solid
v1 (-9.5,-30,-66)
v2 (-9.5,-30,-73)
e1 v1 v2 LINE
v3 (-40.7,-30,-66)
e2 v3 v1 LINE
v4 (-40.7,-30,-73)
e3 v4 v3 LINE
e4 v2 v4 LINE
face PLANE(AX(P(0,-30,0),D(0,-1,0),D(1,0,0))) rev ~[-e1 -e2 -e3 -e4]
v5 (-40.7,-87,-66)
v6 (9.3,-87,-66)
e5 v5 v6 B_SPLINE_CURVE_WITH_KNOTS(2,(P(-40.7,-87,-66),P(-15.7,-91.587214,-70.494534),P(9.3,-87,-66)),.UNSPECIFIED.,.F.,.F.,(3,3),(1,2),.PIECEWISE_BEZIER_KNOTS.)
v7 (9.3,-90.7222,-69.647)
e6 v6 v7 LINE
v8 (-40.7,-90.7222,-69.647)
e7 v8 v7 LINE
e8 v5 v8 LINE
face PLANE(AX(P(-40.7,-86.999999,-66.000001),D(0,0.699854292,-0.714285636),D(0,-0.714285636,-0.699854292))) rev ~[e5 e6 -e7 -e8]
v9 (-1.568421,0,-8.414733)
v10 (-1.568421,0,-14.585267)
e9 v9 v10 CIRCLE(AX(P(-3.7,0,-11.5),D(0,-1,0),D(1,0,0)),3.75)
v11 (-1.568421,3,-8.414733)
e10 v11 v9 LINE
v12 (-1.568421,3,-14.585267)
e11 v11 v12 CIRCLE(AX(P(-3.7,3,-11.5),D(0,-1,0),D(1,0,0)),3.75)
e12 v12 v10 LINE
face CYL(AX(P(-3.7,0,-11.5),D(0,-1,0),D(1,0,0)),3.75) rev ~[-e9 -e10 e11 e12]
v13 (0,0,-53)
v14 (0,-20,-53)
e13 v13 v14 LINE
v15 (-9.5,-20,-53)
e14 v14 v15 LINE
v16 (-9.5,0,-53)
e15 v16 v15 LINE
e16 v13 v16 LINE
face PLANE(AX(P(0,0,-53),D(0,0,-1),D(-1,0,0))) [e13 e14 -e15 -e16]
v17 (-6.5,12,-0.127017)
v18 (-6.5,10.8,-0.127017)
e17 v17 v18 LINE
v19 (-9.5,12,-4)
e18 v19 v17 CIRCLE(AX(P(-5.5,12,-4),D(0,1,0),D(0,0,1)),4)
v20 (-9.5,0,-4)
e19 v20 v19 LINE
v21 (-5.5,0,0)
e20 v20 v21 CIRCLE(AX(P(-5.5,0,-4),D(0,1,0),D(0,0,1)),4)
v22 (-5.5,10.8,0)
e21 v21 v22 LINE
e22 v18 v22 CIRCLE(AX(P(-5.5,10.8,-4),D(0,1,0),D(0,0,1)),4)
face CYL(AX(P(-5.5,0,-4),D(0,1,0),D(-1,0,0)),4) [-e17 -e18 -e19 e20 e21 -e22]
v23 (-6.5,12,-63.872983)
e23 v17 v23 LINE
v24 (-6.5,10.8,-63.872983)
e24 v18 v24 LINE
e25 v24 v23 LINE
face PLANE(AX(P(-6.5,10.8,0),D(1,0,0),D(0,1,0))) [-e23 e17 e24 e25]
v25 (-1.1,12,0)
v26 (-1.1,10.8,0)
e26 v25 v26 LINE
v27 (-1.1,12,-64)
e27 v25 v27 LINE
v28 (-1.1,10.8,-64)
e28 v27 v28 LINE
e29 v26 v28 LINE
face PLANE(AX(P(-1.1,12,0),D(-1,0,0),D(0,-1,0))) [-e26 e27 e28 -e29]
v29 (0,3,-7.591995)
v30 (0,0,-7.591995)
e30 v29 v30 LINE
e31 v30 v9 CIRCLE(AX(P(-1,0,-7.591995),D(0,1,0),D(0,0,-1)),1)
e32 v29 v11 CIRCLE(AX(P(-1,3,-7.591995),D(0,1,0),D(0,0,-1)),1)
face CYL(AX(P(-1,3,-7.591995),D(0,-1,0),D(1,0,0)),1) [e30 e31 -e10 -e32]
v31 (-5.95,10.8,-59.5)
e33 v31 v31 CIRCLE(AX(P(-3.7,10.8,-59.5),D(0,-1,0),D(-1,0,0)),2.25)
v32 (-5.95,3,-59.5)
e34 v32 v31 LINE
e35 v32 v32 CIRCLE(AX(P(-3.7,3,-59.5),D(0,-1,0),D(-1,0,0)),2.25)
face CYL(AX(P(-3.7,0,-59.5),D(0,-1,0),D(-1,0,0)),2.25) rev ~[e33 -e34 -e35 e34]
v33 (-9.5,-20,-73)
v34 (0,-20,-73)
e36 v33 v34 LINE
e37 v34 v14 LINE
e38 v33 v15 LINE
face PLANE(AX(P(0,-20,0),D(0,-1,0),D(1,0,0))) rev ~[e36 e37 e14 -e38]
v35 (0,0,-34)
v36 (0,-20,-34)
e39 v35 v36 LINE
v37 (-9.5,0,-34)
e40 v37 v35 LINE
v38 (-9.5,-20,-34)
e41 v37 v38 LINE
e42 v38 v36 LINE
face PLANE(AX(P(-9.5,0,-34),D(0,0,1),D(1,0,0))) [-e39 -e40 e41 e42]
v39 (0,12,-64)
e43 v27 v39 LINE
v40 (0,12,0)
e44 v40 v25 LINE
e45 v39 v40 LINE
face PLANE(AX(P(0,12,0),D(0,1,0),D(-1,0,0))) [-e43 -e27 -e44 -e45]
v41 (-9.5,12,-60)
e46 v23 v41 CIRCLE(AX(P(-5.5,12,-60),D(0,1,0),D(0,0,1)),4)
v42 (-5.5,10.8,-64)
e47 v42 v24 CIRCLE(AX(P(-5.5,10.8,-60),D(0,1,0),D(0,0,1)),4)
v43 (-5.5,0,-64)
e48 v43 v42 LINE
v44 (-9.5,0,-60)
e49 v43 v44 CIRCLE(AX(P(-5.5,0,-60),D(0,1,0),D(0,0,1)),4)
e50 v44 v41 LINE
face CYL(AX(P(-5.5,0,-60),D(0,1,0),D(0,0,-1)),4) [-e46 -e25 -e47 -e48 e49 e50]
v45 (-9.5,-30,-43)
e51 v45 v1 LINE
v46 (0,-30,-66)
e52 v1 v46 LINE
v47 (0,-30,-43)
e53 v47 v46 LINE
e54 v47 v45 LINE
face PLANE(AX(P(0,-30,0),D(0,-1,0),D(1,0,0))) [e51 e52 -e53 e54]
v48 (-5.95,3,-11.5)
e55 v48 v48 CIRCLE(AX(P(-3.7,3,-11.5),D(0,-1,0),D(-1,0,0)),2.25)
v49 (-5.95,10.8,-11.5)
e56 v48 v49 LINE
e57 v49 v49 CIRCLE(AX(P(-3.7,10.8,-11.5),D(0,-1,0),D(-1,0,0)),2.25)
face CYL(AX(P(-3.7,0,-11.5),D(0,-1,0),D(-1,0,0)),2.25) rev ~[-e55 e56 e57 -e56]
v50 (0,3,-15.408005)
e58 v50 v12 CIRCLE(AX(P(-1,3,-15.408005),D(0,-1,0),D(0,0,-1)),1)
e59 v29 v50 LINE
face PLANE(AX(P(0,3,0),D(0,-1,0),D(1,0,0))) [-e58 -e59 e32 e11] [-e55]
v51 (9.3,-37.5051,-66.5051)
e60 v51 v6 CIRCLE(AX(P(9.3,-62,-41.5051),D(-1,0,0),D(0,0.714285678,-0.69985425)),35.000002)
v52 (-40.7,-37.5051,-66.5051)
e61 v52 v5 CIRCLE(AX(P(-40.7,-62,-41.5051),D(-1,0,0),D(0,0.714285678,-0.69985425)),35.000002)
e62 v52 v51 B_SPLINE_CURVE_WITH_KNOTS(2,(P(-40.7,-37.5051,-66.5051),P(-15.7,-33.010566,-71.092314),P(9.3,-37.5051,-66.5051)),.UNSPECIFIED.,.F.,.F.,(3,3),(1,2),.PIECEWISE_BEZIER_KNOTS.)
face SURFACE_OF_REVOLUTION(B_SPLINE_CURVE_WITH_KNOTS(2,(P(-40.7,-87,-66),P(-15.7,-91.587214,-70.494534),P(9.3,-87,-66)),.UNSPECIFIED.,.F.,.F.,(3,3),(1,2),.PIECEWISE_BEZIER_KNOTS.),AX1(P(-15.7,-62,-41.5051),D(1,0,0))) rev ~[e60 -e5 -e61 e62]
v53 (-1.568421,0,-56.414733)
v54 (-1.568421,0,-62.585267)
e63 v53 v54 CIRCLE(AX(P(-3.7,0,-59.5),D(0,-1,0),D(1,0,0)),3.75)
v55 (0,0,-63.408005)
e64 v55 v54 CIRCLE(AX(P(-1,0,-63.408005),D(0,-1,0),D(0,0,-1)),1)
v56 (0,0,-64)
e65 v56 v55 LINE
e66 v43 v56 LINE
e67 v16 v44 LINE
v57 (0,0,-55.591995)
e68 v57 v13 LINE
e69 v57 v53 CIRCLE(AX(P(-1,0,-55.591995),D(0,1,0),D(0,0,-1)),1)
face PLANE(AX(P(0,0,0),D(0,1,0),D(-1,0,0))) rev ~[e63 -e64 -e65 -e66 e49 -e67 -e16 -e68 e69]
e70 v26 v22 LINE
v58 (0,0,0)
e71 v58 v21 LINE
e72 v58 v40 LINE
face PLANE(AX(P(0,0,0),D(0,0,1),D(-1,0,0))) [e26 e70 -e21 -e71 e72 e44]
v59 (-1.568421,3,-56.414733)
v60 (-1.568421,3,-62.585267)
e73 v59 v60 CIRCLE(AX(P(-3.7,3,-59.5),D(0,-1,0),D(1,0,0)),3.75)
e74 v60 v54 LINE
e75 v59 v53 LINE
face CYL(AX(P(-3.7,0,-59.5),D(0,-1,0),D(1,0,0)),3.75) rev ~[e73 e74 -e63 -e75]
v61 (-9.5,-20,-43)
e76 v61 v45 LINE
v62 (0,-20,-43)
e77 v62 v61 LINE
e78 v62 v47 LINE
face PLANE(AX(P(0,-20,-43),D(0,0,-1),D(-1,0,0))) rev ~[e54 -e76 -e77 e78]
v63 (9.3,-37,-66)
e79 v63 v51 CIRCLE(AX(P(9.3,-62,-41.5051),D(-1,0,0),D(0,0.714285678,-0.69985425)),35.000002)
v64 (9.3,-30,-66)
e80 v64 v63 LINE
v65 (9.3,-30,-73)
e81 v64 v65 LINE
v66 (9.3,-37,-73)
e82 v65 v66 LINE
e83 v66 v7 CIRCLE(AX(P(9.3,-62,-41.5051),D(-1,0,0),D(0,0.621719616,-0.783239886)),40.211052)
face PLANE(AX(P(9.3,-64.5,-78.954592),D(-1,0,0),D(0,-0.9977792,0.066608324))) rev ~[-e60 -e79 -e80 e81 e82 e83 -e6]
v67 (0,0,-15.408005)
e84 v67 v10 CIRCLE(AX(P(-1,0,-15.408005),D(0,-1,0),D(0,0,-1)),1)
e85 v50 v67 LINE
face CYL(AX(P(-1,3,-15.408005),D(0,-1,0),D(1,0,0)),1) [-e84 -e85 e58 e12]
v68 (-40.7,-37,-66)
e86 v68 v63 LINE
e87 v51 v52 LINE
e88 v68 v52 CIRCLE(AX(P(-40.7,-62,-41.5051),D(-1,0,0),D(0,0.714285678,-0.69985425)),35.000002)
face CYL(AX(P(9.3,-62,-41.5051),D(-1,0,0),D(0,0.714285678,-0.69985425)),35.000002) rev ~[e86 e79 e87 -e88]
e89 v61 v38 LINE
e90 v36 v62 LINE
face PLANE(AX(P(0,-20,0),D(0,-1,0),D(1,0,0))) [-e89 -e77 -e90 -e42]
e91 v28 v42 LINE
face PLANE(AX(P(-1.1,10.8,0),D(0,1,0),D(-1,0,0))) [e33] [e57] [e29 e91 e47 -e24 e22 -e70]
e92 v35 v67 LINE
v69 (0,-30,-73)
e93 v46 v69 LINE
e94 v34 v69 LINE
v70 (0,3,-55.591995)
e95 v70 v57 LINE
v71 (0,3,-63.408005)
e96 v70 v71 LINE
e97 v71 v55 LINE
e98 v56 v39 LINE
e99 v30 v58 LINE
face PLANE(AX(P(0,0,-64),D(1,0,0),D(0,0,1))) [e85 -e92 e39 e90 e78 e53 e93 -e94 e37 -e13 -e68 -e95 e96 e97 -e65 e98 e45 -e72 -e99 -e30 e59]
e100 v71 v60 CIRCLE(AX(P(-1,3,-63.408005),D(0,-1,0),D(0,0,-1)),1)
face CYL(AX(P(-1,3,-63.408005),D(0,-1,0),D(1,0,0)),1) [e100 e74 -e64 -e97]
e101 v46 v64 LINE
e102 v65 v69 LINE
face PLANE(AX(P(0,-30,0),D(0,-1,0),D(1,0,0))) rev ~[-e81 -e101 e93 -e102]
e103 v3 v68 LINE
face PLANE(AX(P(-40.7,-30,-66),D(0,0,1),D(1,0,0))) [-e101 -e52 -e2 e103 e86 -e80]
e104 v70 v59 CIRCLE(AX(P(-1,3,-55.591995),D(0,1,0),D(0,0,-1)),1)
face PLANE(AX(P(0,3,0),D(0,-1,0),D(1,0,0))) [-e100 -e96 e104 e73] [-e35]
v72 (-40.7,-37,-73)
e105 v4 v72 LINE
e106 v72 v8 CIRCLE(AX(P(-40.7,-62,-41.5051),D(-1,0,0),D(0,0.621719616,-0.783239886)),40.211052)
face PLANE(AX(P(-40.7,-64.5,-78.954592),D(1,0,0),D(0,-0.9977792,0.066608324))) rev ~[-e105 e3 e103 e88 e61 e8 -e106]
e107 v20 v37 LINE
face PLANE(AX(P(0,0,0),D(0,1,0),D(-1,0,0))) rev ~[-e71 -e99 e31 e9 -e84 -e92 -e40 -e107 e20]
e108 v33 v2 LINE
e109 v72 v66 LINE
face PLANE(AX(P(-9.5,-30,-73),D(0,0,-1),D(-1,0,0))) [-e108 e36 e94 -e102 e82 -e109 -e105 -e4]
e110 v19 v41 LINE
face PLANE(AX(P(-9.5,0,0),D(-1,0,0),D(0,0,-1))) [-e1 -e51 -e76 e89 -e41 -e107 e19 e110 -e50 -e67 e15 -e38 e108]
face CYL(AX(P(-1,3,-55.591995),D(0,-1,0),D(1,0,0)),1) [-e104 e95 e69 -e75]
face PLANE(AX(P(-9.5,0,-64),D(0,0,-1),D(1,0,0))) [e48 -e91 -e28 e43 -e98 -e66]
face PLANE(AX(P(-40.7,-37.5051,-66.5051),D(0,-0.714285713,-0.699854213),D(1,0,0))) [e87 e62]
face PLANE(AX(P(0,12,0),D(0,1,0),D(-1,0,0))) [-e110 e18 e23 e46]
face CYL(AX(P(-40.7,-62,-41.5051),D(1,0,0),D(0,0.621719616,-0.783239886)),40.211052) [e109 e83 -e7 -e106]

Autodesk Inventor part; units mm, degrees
ref_plane "YZ Plane" through (0, 0, 0) normal (1, 0, 0) x (0, 1, 0)
ref_plane "XZ Plane" through (0, 0, 0) normal (0, 1, 0) x (-1, 0, 0)
ref_plane "XY Plane" through (0, 0, 0) normal (0, 0, 1) x (1, 0, 0)
sketch "Sketch1" plane through (0, 0, 0) normal (0, 1, 0) x (-1, 0, 0)
  line L0 (0, 0) -> (9.5, 0)
  line L1 (9.5, 0) -> (9.5, -64)
  line L2 (9.5, -64) -> (0, -64)
  line L3 (0, -64) -> (0, 0)
  circle A0 centre (3.7, -11.5) radius 2.25
  circle A1 centre (3.7, -59.5) radius 2.25
  line L4 (3.7, -11.5) -> (3.7, -59.5) construction
  dimension "d1" = 9.5
  dimension "d2" = 64
  dimension "d3" = 4.5
  dimension "d4" = 48
  dimension "d6" = 3.7
  dimension "d17" = 4.5
extrude "Extrusion1" add sketch "Sketch1" along normal blind 12
sketch "Sketch2" plane through (-9.5, 0, 0) normal (0, 0, 1) x (1, 0, 0)
  line L0 (9.5, 12) -> (0, 12) projected
  line L1 (3, 12) -> (8.4, 12)
  line L2 (8.4, 12) -> (8.4, 10.8)
  line L3 (8.4, 10.8) -> (3, 10.8)
  line L4 (3, 10.8) -> (3, 12)
  line L5 (9.5, 0) -> (9.5, 12) projected
  line L6 (3.55, 0) -> (8.05, 0) projected
  line L7 (3.55, 12) -> (8.05, 12) projected
  line L8 (9.5, 0) -> (9.5, 12) projected
  line L9 (9.5, 0) -> (9.5, 12) projected
  line L10 (3.55, 12) -> (8.05, 12) projected
  line L11 (3.55, 12) -> (3.55, 0) projected
  line L12 (3.55, 12) -> (8.05, 12) projected
  line L13 (3.55, 0) -> (8.05, 0) projected
  line L14 (3.55, 12) -> (8.05, 12) projected
  line L15 (3.55, 0) -> (8.05, 0) projected
  line L16 (3.55, 12) -> (8.05, 12) projected
  line L17 (3.55, 0) -> (8.05, 0) projected
  dimension "d9" = 1.1
  dimension "d10" = 5.4
  dimension "d11" = 1.2
  dimension "d76" = 12
extrude "Extrusion2" cut sketch "Sketch2" against normal up to next
sketch "Sketch3" plane through (0, 0, 0) normal (0, -1, 0) x (1, 0, 0)
  circle A0 centre (-3.7, -11.5) radius 2.25 projected
  circle A1 centre (-3.7, -11.5) radius 3.75
  circle A2 centre (-3.7, -59.5) radius 2.25 projected
  circle A3 centre (-3.7, -59.5) radius 3.75
  point P0 (0, 0)
  dimension "d14" = 7.5
extrude "Extrusion3" cut sketch "Sketch3" against normal blind 3
fillet "Fillet1" radius 1 4 edges at (0, 1.5, -58.8897) (0, 1.5, -60.1103) (0, 1.5, -10.8897) (0, 1.5, -12.1103)
fillet "Fillet2" radius 4 2 edges at (-9.5, 6, -64) (-9.5, 6, 0)
sketch "Sketch28" plane through (0, 0, 0) normal (0, -1, 0) x (1, 0, 0)
  arc A0 (-1.5684, -56.4147) -> (0, -55.592) centre (-1, -55.592) ccw projected
  line L0 (0, -55.592) -> (0, -53)
  line L1 (0, -15.408) -> (0, -55.592) projected
  line L2 (-9.5, -60) -> (-9.5, -4) projected
  line L3 (0, -53) -> (-9.5, -53)
  line L4 (-9.5, -53) -> (-9.5, -34)
  line L5 (-9.5, -34) -> (0, -34)
  line L6 (0, -34) -> (0, -53)
  point P0 (0, 0)
  point P1 (0, -34)
  dimension "d107" = 2.592
  dimension "d108" = 19
extrude "Extrusion19" add sketch "Sketch28" along normal blind 20
sketch "Sketch40" plane through (0, -20, 0) normal (0, -1, 0) x (1, 0, 0)
  line L0 (0, -53) -> (-9.5, -53) projected
  line L1 (-9.5, -53) -> (-9.5, -73)
  line L2 (-9.5, -73) -> (0, -73)
  line L3 (0, -73) -> (0, -43)
  line L4 (0, 0) -> (0, -64) projected
  line L5 (0, -43) -> (-9.5, -43)
  line L6 (-9.5, -43) -> (-9.5, -53)
  line L7 (-9.5, -43) -> (0, -43)
  line L8 (0, -43) -> (0, -73)
  line L9 (0, -73) -> (-9.5, -73)
  line L10 (-9.5, -73) -> (-9.5, -43)
  dimension "d130" = 20
  dimension "d131" = 30
extrude "Extrusion21" add sketch "Sketch40" along normal blind 10
sketch "Sketch41" plane through (0, 0, -53) normal (0, 0, -1) x (-1, 0, 0)
  point P0 (0, 0)
sketch "Sketch42" plane through (0, -30, 0) normal (0, -1, 0) x (1, 0, 0)
  line L0 (-9.5, -73) -> (0, -73) projected
  line L1 (-9.5, -73) -> (-40.7, -73)
  line L2 (-9.5, -73) -> (21.7, -73) construction
  line L3 (-40.7, -73) -> (-40.7, -66)
  line L4 (-40.7, -66) -> (9.3, -66)
  line L5 (9.3, -66) -> (9.3, -73)
  line L6 (9.3, -73) -> (-9.5, -73)
  point P0 (0, 0)
  point P1 (0, -73)
  dimension "d134" = 31.2
  dimension "d135" = 180
  dimension "d136" = 7
  dimension "d137" = 50
  dimension "d138" = 7
extrude "Extrusion22" add sketch "Sketch42" along normal blind 7
sketch "Sketch43" plane through (-40.7, -30, -73) normal (-1, 0, 0) x (0, 0, 1)
  arc A0 (7, -7) -> (7, -57) centre (31.4949, -32) ccw
  point P0 (73, 30)
  dimension "d141" = 50
  dimension "d142" = 35
sketch "Sketch44" plane through (0, -37, 0) normal (0, -1, 0) x (1, 0, 0)
  line L0 (9.3, -73) -> (9.3, -66) projected
  line L1 (-40.7, -73) -> (-9.5, -73) projected
  line L2 (9.3, -66) -> (-40.7, -66)
  line L3 (-40.7, -66) -> (-40.7, -73)
  line L4 (-40.7, -73) -> (9.3, -73)
  line L5 (9.3, -73) -> (9.3, -66)
  point P0 (0, 0)
  point P1 (-9.5, -73)
sweep "Sweep3" add profiles "Sketch44" path "Sketch43"
sketch "Sketch46" plane through (-40.7, -30, -73) normal (-1, 0, 0) x (0, 0, 1)
  arc A0 (7, -7) -> (7, -57) centre (31.4949, -32) ccw projected
  circle A1 centre (31.4949, -32) radius 35 construction
  line L0 (31.4949, -32) -> (3.353, -60.7222)
  arc A2 (0, -7) -> (7.1429, -63.9985) centre (31.4949, -32) ccw projected
  line L1 (31.4949, -32) -> (7.1429, -63.9985)
  point P0 (73, 30)
extrude "Extrusion23" cut sketch "Sketch46" against normal up to surface (50 mm away)
sketch "Sketch47" plane through (-40.7, -87, -66) normal (0, -0.6998542, 0.7142857) x (1, 0, 0)
  line L0 (0, 30.8153) -> (0, -5.2111) projected
  line L1 (0, -3.2111) -> (50, -3.2111) construction
  line L2 (50, 30.8153) -> (50, -5.2111) projected
  line L3 (50, 0) -> (0, 0) projected
  line L4 (0, 0) -> (25, -6.4221) construction
  line L5 (25, -6.4221) -> (50, 0) construction
  spline S0 degree 2 poles (0, 0) (25, -6.4221) (50, 0) knots 1 1 1 2 2 2
  line L6 (0, 0) -> (50, 0)
  line L7 (50, -5.2111) -> (0, -5.2111) projected
  line L8 (60.7, 35) -> (-10.7, 35) projected
  point P0 (40.7, 108.3332)
  dimension "d149" = 2
revolve "Revolution2" cut sketch "Sketch47" angle 90 about axis through (-15.7, -62, -41.5051) along (1, 0, 0) contours L3 S0
sketch "Sketch48" plane through (-40.7, -90.7222, -69.647) normal (0, -0.6998542, 0.7142857) x (1, 0, 0)
  point P0 (40.7, 113.5443)
properties part number "Back"
